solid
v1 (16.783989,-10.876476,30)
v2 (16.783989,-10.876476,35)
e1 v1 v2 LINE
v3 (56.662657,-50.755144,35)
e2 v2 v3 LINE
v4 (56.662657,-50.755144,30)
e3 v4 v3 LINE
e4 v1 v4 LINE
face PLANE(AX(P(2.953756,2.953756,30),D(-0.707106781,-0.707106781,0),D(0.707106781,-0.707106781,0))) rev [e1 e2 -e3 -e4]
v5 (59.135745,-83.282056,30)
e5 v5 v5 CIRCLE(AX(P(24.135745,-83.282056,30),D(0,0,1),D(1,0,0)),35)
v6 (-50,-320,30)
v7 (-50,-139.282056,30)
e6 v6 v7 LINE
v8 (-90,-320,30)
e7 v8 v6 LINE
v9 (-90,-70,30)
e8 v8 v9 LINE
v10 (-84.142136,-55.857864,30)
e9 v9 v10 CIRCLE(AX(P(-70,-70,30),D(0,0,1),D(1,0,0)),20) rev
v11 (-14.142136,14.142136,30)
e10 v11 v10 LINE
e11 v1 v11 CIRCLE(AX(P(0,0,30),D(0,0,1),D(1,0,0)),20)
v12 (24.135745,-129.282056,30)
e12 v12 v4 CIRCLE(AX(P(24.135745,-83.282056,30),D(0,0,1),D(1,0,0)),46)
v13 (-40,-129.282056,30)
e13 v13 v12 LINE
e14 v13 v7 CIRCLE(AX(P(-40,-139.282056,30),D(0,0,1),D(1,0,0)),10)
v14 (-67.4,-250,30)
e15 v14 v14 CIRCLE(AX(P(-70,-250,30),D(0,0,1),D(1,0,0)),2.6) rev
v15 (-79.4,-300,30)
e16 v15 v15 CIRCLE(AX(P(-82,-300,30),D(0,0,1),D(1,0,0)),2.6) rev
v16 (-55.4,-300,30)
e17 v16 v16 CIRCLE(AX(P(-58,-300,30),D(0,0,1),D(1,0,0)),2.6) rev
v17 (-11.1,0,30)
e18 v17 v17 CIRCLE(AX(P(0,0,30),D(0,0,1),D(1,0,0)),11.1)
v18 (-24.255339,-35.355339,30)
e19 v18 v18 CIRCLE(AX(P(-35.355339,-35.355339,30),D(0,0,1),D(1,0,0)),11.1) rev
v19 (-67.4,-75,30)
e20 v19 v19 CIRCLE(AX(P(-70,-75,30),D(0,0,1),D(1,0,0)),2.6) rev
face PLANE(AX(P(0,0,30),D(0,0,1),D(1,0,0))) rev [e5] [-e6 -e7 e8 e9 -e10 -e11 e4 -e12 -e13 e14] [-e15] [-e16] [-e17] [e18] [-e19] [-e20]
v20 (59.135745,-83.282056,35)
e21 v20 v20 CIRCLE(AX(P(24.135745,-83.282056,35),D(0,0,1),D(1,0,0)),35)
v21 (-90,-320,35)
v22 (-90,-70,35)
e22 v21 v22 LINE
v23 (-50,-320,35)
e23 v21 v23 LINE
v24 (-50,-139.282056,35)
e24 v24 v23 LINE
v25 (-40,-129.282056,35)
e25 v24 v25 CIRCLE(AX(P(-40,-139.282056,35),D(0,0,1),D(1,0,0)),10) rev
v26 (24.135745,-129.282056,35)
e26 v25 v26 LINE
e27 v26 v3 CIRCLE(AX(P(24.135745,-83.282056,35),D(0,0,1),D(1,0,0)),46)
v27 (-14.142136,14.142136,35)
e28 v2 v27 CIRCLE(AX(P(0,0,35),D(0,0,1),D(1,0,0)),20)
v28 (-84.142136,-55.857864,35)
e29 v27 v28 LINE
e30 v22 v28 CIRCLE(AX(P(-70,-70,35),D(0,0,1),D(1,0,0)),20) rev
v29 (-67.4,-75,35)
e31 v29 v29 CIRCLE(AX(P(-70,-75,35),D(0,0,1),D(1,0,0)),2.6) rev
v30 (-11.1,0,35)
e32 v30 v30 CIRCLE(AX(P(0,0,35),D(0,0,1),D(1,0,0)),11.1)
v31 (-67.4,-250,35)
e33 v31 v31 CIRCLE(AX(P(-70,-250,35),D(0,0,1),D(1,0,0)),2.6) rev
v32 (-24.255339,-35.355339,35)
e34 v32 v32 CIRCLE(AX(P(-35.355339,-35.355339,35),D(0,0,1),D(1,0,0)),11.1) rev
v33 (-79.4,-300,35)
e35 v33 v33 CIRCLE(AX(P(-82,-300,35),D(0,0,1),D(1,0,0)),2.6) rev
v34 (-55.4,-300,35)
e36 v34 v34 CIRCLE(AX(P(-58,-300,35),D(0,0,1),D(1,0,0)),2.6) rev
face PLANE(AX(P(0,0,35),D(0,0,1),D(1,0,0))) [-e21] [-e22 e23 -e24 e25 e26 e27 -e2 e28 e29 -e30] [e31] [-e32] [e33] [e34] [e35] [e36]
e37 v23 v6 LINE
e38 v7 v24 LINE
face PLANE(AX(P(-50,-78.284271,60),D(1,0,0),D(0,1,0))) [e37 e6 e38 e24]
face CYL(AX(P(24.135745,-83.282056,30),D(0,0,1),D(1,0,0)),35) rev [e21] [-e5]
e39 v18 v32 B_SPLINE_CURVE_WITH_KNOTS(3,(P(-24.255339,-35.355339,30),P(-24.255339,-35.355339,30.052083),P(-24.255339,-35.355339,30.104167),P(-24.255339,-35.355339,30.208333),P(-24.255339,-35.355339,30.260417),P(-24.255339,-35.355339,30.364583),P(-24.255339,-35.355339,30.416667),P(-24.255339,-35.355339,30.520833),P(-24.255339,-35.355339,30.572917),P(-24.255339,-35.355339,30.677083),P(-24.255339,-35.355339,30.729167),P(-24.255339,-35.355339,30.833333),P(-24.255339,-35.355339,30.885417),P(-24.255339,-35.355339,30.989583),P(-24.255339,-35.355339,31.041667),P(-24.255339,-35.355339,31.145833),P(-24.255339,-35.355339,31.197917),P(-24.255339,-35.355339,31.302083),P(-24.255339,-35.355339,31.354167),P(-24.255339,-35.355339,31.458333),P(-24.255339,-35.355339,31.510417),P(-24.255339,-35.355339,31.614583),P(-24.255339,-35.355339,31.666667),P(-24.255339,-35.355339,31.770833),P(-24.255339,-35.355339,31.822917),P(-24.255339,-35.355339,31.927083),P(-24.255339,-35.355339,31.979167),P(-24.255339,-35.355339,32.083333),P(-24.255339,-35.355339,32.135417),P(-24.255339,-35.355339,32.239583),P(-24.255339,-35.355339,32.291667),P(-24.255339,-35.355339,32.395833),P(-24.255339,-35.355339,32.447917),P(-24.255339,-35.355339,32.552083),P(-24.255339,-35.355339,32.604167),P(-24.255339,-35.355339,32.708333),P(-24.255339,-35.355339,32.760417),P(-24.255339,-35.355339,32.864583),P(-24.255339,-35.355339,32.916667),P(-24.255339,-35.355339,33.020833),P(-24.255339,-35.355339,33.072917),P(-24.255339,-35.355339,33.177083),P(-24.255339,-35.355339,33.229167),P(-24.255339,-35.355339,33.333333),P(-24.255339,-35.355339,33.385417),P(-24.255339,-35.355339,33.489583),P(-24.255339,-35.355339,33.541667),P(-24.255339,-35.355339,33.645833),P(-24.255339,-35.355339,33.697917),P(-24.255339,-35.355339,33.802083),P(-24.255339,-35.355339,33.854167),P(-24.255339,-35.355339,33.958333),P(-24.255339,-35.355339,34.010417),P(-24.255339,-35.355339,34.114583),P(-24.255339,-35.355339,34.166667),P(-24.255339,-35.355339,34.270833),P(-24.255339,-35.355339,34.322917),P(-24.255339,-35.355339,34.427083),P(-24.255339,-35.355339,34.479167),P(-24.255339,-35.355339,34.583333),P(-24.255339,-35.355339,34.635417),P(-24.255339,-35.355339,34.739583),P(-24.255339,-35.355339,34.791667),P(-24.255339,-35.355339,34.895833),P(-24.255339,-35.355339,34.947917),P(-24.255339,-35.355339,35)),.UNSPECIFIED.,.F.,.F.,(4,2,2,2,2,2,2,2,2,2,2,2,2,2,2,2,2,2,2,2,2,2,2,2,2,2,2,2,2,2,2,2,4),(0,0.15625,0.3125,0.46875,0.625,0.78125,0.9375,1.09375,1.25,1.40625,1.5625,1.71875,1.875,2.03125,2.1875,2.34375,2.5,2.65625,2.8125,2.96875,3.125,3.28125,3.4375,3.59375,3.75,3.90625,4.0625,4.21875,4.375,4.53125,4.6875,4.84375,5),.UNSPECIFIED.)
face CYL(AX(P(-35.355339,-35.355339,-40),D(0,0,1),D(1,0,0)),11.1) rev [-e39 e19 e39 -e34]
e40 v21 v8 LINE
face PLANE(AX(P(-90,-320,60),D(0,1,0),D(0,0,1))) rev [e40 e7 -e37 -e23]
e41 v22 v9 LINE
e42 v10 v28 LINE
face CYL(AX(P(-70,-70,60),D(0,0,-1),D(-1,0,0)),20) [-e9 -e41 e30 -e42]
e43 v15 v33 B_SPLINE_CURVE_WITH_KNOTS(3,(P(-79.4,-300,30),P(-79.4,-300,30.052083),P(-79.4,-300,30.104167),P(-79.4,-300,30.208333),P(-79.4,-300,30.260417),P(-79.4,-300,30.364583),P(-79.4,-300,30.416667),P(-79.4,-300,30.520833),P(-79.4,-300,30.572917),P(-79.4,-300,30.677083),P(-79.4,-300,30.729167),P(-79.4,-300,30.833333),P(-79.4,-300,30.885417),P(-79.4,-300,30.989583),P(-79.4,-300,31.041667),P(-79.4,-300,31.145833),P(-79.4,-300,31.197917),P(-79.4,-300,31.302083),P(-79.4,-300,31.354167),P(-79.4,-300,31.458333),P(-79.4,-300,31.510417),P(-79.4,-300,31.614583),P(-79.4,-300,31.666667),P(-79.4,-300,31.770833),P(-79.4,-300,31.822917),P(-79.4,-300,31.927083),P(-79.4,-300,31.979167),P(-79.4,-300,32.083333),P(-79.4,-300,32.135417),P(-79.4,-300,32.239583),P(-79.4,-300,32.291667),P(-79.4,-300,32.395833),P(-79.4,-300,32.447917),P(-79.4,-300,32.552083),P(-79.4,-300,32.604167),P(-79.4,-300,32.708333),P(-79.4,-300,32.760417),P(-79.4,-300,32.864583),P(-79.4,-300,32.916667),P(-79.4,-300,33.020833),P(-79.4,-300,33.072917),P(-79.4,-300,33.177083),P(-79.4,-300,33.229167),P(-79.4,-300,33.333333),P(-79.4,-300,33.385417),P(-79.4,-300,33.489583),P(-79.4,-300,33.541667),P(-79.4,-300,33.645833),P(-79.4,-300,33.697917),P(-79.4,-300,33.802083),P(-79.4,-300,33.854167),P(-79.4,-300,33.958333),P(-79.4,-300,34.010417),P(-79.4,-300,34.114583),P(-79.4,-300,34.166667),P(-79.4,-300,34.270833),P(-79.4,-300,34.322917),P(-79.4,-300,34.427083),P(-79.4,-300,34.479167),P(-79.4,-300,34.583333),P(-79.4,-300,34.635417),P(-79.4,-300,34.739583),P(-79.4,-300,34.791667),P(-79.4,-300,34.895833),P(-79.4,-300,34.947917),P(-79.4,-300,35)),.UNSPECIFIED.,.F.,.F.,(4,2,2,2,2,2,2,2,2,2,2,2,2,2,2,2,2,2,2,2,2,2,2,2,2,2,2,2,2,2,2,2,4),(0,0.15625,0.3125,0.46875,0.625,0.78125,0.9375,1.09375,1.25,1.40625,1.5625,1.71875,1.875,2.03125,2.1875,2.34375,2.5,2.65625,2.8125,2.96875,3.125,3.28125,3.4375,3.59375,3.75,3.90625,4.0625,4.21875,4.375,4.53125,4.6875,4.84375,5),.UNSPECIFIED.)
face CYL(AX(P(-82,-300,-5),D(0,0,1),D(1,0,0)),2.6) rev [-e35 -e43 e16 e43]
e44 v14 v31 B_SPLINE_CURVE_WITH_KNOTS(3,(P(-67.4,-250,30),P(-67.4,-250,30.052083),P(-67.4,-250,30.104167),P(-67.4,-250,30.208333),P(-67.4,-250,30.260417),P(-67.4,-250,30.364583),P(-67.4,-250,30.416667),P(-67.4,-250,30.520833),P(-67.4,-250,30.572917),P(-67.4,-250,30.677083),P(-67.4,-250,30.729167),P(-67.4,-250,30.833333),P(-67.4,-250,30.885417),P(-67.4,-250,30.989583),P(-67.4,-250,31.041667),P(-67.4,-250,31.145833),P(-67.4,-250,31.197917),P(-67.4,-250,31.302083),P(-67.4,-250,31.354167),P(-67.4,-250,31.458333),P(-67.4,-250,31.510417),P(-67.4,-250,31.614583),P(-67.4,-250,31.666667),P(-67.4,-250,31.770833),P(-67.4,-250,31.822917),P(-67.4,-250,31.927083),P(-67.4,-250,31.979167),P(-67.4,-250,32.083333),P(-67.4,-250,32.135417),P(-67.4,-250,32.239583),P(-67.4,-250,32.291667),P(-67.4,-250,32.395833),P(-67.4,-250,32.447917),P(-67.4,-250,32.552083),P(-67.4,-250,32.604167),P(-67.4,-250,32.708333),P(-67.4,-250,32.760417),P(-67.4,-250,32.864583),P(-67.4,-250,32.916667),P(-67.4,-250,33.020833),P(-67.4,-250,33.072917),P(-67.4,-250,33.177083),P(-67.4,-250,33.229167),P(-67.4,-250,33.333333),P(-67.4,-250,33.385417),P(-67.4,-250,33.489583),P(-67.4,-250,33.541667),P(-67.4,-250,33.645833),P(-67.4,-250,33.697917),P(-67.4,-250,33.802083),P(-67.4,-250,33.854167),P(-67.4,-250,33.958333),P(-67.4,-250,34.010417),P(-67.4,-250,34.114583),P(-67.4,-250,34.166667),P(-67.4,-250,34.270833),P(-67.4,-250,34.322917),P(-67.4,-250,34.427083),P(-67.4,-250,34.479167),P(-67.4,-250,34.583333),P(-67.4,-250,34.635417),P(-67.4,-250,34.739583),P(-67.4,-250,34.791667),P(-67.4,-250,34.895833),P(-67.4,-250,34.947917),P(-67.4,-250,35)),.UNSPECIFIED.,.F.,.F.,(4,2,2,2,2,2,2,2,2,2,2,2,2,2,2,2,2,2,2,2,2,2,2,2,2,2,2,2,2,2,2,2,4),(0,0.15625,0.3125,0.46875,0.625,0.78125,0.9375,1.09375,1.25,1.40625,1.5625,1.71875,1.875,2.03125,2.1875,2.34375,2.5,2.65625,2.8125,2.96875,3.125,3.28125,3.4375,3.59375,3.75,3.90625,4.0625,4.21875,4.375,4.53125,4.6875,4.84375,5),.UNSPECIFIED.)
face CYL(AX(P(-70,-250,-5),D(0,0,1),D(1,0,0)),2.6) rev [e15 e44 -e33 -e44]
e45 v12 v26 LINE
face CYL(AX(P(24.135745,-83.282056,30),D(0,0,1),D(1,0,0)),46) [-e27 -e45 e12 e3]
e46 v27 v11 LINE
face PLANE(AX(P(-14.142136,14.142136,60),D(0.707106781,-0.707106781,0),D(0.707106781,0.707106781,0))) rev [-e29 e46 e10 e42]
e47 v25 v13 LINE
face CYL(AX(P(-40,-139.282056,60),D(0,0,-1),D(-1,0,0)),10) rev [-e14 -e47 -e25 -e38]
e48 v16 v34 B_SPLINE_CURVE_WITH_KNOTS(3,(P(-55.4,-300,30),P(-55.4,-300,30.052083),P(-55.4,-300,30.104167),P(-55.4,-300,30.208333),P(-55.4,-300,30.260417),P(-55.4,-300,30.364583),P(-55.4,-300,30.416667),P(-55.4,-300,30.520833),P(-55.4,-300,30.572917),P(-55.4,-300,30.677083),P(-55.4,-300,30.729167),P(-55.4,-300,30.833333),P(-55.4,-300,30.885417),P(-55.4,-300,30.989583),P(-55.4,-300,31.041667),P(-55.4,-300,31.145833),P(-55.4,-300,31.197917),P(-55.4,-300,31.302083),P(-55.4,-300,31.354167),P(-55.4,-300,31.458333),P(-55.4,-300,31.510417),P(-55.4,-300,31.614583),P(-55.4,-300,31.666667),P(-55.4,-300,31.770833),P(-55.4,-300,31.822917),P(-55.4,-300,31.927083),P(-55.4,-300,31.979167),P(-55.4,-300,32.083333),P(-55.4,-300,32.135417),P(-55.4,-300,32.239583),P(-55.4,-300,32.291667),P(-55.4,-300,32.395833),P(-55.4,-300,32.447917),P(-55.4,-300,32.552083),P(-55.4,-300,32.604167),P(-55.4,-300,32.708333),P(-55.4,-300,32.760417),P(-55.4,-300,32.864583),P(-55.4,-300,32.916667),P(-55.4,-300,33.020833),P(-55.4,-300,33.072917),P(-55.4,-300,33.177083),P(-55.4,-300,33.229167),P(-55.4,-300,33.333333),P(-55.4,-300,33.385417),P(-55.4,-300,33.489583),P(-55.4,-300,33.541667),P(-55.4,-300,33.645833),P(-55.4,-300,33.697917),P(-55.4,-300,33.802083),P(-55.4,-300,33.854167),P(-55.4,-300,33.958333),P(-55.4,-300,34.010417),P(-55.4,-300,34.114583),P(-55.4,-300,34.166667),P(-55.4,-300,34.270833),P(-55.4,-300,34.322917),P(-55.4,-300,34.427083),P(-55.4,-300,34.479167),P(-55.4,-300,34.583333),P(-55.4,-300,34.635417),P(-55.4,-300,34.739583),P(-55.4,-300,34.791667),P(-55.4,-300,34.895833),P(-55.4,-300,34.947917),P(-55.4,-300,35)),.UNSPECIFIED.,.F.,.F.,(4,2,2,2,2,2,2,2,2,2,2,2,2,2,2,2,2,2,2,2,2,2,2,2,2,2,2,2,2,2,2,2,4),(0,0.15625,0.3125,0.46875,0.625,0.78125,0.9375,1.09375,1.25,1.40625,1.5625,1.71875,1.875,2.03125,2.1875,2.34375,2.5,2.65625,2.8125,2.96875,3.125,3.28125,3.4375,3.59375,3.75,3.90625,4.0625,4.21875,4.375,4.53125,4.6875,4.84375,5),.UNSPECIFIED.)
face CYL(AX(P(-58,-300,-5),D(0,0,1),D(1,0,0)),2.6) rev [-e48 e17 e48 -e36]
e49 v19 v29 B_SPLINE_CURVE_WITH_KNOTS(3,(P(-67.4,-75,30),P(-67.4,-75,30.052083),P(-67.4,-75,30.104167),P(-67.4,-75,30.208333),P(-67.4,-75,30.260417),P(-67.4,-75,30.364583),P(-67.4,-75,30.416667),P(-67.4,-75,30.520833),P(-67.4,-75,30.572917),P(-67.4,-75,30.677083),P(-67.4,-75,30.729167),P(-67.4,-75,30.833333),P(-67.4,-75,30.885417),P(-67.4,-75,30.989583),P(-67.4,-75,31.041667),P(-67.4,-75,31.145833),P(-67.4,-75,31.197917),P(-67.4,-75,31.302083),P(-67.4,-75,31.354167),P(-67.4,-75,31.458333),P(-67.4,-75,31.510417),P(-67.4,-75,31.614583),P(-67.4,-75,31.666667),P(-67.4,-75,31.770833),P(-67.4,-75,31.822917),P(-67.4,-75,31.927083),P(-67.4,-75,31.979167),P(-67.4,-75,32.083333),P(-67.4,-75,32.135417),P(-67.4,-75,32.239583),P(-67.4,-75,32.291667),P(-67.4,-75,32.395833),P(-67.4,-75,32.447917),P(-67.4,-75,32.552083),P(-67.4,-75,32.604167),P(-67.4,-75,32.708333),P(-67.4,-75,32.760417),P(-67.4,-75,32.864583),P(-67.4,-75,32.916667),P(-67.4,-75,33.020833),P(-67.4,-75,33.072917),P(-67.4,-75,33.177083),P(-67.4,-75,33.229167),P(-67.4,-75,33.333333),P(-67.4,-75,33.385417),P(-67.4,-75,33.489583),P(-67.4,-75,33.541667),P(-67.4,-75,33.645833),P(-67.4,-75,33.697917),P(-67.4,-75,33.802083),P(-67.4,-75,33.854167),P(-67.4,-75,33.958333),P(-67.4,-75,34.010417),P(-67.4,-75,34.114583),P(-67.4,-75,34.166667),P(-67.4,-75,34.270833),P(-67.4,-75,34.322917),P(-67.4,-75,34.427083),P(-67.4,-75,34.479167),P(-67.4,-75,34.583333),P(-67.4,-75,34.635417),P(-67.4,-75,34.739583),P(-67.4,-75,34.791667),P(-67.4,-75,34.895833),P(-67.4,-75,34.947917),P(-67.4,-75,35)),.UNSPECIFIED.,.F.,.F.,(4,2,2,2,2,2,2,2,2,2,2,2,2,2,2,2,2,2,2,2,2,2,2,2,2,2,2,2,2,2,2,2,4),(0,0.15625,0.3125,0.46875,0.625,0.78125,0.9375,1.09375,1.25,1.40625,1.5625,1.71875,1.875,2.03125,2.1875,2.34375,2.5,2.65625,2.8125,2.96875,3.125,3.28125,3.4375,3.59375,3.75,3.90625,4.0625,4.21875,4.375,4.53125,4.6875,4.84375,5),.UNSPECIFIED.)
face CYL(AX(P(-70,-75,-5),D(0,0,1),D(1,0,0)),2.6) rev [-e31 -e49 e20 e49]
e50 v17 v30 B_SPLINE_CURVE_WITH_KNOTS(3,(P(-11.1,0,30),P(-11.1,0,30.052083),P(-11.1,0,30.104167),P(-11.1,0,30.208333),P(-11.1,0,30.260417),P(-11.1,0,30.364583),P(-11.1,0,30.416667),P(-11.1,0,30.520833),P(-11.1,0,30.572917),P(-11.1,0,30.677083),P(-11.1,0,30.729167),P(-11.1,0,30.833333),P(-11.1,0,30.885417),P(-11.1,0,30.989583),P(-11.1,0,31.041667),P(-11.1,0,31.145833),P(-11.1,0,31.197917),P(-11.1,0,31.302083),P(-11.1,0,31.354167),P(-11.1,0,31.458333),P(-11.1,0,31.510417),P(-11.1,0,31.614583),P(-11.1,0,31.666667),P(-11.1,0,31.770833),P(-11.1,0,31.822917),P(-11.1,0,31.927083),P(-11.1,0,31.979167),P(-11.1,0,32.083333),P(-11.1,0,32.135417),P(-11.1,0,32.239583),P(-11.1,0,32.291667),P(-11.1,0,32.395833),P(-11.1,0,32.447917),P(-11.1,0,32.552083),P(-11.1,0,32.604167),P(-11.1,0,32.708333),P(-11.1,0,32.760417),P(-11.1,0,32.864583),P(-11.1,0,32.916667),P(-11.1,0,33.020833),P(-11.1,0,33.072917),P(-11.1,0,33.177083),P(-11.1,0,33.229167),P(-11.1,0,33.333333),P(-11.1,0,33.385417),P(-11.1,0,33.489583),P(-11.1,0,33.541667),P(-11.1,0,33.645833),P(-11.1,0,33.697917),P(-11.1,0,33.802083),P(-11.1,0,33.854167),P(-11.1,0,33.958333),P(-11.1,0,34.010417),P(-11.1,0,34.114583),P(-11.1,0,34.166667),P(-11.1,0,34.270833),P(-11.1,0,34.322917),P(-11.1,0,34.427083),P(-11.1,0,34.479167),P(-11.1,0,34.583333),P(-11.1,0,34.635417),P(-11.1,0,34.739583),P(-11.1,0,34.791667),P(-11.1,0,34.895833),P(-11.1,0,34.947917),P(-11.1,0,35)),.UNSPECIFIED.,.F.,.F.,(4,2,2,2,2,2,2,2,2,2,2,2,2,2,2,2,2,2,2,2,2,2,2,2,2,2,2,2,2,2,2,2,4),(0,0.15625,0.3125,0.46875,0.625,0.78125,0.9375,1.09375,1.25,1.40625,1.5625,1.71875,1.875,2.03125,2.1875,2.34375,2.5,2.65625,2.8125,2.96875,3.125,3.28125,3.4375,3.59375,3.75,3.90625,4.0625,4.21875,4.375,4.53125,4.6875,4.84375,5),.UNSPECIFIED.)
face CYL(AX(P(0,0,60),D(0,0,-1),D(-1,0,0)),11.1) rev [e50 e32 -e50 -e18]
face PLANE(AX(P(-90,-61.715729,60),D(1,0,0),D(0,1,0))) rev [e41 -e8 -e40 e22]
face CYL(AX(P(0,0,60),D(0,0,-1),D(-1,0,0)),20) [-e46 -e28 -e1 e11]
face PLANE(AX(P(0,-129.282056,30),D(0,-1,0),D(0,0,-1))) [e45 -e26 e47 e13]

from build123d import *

# Parameters (mm, degrees)
SKETCH_1_R                = 20
SKETCH_1_R_2              = 11.1
EXTRUDE_1_DEPTH           = 60
EXTRUDE_2_DEPTH           = 30
SKETCH_4_R                = 11
EXTRUDE_3_DEPTH           = 5
SKETCH_8_R                = 11.1
CUT_EXTRUDE_1_DEPTH       = 100
FILLET_4_R                = 20
EXTRUDE_START             = -30
SKETCH_18_R               = 35
EXTRUDE_4_DEPTH           = 5
EXTRUDE_START_2           = -25
SKETCH_19_R               = 35
EXTRUDE_5_DEPTH           = 5
FILLET_5_R                = 10
CUT_EXTRUDE_9_DEPTH       = 388.169213652
CUT_EXTRUDE_9_DEPTH_BACK  = 388.169213652
SKETCH_21_R               = 2.6
CUT_EXTRUDE_10_DEPTH      = 409.372938359
CUT_EXTRUDE_10_DEPTH_BACK = 409.372938359
SKETCH_22_W               = 35
SKETCH_22_H               = 453.381241258
SKETCH_22_W_2             = 30
SKETCH_22_H_2             = 431.087956996


with BuildPart() as part:
    # 草图1 → 凸台-拉伸1 (new body)
    with BuildSketch(Plane.XY):
        Circle(SKETCH_1_R)
        Circle(SKETCH_1_R_2, mode=Mode.SUBTRACT)
    extrude(amount=EXTRUDE_1_DEPTH)

    # 草图2 → 凸台-拉伸2 (add, symmetric)
    with BuildSketch(Plane.XY.offset(30)):
        with BuildLine():
            Line((-14.142135624, 14.142135624), (-90, -61.715728753))
            Line((-90, -61.715728753), (-90, -320))
            Line((-90, -320), (-50, -320))
            Line((-50, -320), (-50, -78.284271247))
            Line((-50, -78.284271247), (14.142135624, -14.142135624))
            ThreePointArc((14.142135624, -14.142135624), (-14.142135624, -14.142135624), (-14.142135624, 14.142135624))
        make_face()
    extrude(amount=EXTRUDE_2_DEPTH, both=True)

    # 草图4 → 凸台-拉伸3 (add)
    with BuildSketch(Plane.XY.offset(60)):
        with BuildLine():
            Line((-90, -290), (-50, -290))
            Line((-50, -290), (-50, -350))
            ThreePointArc((-50, -350), (-70, -370), (-90, -350))
            Line((-90, -350), (-90, -290))
        make_face()
        with Locations((-70, -350)):
            Circle(SKETCH_4_R, mode=Mode.SUBTRACT)
    extrude_3 = extrude(amount=EXTRUDE_3_DEPTH)

    # 镜向1: 凸台-拉伸3 across plane
    add(extrude_3.mirror(Plane.XY.offset(30)))

    # 草图8 → 切除-拉伸1 (cut)
    with BuildSketch(Plane.XY.offset(60)):
        with Locations((-35.355339059, -35.355339059)):
            Circle(SKETCH_8_R)
    extrude(amount=-CUT_EXTRUDE_1_DEPTH, mode=Mode.SUBTRACT)

    # 圆角4
    fillet_4_edges = [part.edges().sort_by_distance(p)[0] for p in [
        (-50, -78.284271247, 30),
        (-90, -61.715728753, 30),
    ]]
    fillet(fillet_4_edges, radius=FILLET_4_R)

    # 草图18 → 凸台-拉伸4 (add)
    with BuildSketch(Plane.XY.offset(60).offset(EXTRUDE_START)):
        with BuildLine():
            ThreePointArc((16.783988507, -10.876475983), (15.54903282, -12.578854413), (14.142135624, -14.142135624))
            Line((14.142135624, -14.142135624), (-44.142135624, -72.426406871))
            ThreePointArc((-44.142135624, -72.426406871), (-48.47759065, -78.914873848), (-50, -86.568542495))
            Line((-50, -86.568542495), (-50, -129.282056212))
            Line((-50, -129.282056212), (24.135744866, -129.282056212))
            ThreePointArc((24.135744866, -129.282056212), (66.634203362, -100.885494101), (56.662656801, -50.755144277))
            Line((56.662656801, -50.755144277), (16.783988507, -10.876475983))
        make_face()
        with Locations((24.135744866, -83.282056212)):
            Circle(SKETCH_18_R, mode=Mode.SUBTRACT)
    extrude(amount=EXTRUDE_4_DEPTH)

    # 草图19 → 凸台-拉伸5 (add)
    with BuildSketch(Plane(origin=(0, 0, 0), x_dir=(-1, 0, 0), z_dir=(0, 0, -1)).offset(EXTRUDE_START_2)):
        with BuildLine():
            Line((50, -135.340123781), (50, -227.340123781))
            Line((50, -227.340123781), (-4.524131353, -227.340123781))
            ThreePointArc((-4.524131353, -227.340123781), (-50.524131353, -181.340123781), (-4.524131353, -135.340123781))
            Line((-4.524131353, -135.340123781), (50, -135.340123781))
        make_face()
        with Locations((-4.524131353, -181.340123781)):
            Circle(SKETCH_19_R, mode=Mode.SUBTRACT)
    extrude(amount=-EXTRUDE_5_DEPTH)

    # 圆角5
    # the kernel refuses this fillet: 10 mm, written as the material it adds along each edge
    with BuildSketch(Plane(origin=(-50, -227.340123781, 25), x_dir=(0, -1, 0), z_dir=(0, 0, 1)), Plane(origin=(-50, -129.282056212, 30), x_dir=(0, -1, 0), z_dir=(0, 0, 1))) as fillet_5_piece_1:
        with BuildLine():
            CenterArc((FILLET_5_R, FILLET_5_R), FILLET_5_R, 180, 90)
            Line((0, FILLET_5_R), (0, 0))
            Line((0, 0), (FILLET_5_R, 0))
        make_face()
    extrude(amount=5)

    # 草图21 → 切除-拉伸9 (cut, two sides: drawn at the far end of the back side and taken through both)
    with BuildSketch(Plane.XY.offset(65).offset(-CUT_EXTRUDE_9_DEPTH_BACK)):
        with Locations((-70, -75)):
            Circle(SKETCH_21_R)
        with Locations((-70, -250)):
            Circle(SKETCH_21_R)
        with Locations((-58, -300)):
            Circle(SKETCH_21_R)
        with Locations((-82, -300)):
            Circle(SKETCH_21_R)
    extrude(amount=CUT_EXTRUDE_9_DEPTH + CUT_EXTRUDE_9_DEPTH_BACK, mode=Mode.SUBTRACT)

    # 草图22 → 切除-拉伸10 (cut, two sides: drawn at the far end of the back side and taken through both)
    with BuildSketch(Plane.ZY.offset(90).offset(-CUT_EXTRUDE_10_DEPTH_BACK)):
        with Locations((12.5, -161.772701044)):
            Rectangle(SKETCH_22_W, SKETCH_22_H)
        with Locations((50, -154.456021502)):
            Rectangle(SKETCH_22_W_2, SKETCH_22_H_2)
    extrude(amount=CUT_EXTRUDE_10_DEPTH + CUT_EXTRUDE_10_DEPTH_BACK, mode=Mode.SUBTRACT)


solid = part.part
